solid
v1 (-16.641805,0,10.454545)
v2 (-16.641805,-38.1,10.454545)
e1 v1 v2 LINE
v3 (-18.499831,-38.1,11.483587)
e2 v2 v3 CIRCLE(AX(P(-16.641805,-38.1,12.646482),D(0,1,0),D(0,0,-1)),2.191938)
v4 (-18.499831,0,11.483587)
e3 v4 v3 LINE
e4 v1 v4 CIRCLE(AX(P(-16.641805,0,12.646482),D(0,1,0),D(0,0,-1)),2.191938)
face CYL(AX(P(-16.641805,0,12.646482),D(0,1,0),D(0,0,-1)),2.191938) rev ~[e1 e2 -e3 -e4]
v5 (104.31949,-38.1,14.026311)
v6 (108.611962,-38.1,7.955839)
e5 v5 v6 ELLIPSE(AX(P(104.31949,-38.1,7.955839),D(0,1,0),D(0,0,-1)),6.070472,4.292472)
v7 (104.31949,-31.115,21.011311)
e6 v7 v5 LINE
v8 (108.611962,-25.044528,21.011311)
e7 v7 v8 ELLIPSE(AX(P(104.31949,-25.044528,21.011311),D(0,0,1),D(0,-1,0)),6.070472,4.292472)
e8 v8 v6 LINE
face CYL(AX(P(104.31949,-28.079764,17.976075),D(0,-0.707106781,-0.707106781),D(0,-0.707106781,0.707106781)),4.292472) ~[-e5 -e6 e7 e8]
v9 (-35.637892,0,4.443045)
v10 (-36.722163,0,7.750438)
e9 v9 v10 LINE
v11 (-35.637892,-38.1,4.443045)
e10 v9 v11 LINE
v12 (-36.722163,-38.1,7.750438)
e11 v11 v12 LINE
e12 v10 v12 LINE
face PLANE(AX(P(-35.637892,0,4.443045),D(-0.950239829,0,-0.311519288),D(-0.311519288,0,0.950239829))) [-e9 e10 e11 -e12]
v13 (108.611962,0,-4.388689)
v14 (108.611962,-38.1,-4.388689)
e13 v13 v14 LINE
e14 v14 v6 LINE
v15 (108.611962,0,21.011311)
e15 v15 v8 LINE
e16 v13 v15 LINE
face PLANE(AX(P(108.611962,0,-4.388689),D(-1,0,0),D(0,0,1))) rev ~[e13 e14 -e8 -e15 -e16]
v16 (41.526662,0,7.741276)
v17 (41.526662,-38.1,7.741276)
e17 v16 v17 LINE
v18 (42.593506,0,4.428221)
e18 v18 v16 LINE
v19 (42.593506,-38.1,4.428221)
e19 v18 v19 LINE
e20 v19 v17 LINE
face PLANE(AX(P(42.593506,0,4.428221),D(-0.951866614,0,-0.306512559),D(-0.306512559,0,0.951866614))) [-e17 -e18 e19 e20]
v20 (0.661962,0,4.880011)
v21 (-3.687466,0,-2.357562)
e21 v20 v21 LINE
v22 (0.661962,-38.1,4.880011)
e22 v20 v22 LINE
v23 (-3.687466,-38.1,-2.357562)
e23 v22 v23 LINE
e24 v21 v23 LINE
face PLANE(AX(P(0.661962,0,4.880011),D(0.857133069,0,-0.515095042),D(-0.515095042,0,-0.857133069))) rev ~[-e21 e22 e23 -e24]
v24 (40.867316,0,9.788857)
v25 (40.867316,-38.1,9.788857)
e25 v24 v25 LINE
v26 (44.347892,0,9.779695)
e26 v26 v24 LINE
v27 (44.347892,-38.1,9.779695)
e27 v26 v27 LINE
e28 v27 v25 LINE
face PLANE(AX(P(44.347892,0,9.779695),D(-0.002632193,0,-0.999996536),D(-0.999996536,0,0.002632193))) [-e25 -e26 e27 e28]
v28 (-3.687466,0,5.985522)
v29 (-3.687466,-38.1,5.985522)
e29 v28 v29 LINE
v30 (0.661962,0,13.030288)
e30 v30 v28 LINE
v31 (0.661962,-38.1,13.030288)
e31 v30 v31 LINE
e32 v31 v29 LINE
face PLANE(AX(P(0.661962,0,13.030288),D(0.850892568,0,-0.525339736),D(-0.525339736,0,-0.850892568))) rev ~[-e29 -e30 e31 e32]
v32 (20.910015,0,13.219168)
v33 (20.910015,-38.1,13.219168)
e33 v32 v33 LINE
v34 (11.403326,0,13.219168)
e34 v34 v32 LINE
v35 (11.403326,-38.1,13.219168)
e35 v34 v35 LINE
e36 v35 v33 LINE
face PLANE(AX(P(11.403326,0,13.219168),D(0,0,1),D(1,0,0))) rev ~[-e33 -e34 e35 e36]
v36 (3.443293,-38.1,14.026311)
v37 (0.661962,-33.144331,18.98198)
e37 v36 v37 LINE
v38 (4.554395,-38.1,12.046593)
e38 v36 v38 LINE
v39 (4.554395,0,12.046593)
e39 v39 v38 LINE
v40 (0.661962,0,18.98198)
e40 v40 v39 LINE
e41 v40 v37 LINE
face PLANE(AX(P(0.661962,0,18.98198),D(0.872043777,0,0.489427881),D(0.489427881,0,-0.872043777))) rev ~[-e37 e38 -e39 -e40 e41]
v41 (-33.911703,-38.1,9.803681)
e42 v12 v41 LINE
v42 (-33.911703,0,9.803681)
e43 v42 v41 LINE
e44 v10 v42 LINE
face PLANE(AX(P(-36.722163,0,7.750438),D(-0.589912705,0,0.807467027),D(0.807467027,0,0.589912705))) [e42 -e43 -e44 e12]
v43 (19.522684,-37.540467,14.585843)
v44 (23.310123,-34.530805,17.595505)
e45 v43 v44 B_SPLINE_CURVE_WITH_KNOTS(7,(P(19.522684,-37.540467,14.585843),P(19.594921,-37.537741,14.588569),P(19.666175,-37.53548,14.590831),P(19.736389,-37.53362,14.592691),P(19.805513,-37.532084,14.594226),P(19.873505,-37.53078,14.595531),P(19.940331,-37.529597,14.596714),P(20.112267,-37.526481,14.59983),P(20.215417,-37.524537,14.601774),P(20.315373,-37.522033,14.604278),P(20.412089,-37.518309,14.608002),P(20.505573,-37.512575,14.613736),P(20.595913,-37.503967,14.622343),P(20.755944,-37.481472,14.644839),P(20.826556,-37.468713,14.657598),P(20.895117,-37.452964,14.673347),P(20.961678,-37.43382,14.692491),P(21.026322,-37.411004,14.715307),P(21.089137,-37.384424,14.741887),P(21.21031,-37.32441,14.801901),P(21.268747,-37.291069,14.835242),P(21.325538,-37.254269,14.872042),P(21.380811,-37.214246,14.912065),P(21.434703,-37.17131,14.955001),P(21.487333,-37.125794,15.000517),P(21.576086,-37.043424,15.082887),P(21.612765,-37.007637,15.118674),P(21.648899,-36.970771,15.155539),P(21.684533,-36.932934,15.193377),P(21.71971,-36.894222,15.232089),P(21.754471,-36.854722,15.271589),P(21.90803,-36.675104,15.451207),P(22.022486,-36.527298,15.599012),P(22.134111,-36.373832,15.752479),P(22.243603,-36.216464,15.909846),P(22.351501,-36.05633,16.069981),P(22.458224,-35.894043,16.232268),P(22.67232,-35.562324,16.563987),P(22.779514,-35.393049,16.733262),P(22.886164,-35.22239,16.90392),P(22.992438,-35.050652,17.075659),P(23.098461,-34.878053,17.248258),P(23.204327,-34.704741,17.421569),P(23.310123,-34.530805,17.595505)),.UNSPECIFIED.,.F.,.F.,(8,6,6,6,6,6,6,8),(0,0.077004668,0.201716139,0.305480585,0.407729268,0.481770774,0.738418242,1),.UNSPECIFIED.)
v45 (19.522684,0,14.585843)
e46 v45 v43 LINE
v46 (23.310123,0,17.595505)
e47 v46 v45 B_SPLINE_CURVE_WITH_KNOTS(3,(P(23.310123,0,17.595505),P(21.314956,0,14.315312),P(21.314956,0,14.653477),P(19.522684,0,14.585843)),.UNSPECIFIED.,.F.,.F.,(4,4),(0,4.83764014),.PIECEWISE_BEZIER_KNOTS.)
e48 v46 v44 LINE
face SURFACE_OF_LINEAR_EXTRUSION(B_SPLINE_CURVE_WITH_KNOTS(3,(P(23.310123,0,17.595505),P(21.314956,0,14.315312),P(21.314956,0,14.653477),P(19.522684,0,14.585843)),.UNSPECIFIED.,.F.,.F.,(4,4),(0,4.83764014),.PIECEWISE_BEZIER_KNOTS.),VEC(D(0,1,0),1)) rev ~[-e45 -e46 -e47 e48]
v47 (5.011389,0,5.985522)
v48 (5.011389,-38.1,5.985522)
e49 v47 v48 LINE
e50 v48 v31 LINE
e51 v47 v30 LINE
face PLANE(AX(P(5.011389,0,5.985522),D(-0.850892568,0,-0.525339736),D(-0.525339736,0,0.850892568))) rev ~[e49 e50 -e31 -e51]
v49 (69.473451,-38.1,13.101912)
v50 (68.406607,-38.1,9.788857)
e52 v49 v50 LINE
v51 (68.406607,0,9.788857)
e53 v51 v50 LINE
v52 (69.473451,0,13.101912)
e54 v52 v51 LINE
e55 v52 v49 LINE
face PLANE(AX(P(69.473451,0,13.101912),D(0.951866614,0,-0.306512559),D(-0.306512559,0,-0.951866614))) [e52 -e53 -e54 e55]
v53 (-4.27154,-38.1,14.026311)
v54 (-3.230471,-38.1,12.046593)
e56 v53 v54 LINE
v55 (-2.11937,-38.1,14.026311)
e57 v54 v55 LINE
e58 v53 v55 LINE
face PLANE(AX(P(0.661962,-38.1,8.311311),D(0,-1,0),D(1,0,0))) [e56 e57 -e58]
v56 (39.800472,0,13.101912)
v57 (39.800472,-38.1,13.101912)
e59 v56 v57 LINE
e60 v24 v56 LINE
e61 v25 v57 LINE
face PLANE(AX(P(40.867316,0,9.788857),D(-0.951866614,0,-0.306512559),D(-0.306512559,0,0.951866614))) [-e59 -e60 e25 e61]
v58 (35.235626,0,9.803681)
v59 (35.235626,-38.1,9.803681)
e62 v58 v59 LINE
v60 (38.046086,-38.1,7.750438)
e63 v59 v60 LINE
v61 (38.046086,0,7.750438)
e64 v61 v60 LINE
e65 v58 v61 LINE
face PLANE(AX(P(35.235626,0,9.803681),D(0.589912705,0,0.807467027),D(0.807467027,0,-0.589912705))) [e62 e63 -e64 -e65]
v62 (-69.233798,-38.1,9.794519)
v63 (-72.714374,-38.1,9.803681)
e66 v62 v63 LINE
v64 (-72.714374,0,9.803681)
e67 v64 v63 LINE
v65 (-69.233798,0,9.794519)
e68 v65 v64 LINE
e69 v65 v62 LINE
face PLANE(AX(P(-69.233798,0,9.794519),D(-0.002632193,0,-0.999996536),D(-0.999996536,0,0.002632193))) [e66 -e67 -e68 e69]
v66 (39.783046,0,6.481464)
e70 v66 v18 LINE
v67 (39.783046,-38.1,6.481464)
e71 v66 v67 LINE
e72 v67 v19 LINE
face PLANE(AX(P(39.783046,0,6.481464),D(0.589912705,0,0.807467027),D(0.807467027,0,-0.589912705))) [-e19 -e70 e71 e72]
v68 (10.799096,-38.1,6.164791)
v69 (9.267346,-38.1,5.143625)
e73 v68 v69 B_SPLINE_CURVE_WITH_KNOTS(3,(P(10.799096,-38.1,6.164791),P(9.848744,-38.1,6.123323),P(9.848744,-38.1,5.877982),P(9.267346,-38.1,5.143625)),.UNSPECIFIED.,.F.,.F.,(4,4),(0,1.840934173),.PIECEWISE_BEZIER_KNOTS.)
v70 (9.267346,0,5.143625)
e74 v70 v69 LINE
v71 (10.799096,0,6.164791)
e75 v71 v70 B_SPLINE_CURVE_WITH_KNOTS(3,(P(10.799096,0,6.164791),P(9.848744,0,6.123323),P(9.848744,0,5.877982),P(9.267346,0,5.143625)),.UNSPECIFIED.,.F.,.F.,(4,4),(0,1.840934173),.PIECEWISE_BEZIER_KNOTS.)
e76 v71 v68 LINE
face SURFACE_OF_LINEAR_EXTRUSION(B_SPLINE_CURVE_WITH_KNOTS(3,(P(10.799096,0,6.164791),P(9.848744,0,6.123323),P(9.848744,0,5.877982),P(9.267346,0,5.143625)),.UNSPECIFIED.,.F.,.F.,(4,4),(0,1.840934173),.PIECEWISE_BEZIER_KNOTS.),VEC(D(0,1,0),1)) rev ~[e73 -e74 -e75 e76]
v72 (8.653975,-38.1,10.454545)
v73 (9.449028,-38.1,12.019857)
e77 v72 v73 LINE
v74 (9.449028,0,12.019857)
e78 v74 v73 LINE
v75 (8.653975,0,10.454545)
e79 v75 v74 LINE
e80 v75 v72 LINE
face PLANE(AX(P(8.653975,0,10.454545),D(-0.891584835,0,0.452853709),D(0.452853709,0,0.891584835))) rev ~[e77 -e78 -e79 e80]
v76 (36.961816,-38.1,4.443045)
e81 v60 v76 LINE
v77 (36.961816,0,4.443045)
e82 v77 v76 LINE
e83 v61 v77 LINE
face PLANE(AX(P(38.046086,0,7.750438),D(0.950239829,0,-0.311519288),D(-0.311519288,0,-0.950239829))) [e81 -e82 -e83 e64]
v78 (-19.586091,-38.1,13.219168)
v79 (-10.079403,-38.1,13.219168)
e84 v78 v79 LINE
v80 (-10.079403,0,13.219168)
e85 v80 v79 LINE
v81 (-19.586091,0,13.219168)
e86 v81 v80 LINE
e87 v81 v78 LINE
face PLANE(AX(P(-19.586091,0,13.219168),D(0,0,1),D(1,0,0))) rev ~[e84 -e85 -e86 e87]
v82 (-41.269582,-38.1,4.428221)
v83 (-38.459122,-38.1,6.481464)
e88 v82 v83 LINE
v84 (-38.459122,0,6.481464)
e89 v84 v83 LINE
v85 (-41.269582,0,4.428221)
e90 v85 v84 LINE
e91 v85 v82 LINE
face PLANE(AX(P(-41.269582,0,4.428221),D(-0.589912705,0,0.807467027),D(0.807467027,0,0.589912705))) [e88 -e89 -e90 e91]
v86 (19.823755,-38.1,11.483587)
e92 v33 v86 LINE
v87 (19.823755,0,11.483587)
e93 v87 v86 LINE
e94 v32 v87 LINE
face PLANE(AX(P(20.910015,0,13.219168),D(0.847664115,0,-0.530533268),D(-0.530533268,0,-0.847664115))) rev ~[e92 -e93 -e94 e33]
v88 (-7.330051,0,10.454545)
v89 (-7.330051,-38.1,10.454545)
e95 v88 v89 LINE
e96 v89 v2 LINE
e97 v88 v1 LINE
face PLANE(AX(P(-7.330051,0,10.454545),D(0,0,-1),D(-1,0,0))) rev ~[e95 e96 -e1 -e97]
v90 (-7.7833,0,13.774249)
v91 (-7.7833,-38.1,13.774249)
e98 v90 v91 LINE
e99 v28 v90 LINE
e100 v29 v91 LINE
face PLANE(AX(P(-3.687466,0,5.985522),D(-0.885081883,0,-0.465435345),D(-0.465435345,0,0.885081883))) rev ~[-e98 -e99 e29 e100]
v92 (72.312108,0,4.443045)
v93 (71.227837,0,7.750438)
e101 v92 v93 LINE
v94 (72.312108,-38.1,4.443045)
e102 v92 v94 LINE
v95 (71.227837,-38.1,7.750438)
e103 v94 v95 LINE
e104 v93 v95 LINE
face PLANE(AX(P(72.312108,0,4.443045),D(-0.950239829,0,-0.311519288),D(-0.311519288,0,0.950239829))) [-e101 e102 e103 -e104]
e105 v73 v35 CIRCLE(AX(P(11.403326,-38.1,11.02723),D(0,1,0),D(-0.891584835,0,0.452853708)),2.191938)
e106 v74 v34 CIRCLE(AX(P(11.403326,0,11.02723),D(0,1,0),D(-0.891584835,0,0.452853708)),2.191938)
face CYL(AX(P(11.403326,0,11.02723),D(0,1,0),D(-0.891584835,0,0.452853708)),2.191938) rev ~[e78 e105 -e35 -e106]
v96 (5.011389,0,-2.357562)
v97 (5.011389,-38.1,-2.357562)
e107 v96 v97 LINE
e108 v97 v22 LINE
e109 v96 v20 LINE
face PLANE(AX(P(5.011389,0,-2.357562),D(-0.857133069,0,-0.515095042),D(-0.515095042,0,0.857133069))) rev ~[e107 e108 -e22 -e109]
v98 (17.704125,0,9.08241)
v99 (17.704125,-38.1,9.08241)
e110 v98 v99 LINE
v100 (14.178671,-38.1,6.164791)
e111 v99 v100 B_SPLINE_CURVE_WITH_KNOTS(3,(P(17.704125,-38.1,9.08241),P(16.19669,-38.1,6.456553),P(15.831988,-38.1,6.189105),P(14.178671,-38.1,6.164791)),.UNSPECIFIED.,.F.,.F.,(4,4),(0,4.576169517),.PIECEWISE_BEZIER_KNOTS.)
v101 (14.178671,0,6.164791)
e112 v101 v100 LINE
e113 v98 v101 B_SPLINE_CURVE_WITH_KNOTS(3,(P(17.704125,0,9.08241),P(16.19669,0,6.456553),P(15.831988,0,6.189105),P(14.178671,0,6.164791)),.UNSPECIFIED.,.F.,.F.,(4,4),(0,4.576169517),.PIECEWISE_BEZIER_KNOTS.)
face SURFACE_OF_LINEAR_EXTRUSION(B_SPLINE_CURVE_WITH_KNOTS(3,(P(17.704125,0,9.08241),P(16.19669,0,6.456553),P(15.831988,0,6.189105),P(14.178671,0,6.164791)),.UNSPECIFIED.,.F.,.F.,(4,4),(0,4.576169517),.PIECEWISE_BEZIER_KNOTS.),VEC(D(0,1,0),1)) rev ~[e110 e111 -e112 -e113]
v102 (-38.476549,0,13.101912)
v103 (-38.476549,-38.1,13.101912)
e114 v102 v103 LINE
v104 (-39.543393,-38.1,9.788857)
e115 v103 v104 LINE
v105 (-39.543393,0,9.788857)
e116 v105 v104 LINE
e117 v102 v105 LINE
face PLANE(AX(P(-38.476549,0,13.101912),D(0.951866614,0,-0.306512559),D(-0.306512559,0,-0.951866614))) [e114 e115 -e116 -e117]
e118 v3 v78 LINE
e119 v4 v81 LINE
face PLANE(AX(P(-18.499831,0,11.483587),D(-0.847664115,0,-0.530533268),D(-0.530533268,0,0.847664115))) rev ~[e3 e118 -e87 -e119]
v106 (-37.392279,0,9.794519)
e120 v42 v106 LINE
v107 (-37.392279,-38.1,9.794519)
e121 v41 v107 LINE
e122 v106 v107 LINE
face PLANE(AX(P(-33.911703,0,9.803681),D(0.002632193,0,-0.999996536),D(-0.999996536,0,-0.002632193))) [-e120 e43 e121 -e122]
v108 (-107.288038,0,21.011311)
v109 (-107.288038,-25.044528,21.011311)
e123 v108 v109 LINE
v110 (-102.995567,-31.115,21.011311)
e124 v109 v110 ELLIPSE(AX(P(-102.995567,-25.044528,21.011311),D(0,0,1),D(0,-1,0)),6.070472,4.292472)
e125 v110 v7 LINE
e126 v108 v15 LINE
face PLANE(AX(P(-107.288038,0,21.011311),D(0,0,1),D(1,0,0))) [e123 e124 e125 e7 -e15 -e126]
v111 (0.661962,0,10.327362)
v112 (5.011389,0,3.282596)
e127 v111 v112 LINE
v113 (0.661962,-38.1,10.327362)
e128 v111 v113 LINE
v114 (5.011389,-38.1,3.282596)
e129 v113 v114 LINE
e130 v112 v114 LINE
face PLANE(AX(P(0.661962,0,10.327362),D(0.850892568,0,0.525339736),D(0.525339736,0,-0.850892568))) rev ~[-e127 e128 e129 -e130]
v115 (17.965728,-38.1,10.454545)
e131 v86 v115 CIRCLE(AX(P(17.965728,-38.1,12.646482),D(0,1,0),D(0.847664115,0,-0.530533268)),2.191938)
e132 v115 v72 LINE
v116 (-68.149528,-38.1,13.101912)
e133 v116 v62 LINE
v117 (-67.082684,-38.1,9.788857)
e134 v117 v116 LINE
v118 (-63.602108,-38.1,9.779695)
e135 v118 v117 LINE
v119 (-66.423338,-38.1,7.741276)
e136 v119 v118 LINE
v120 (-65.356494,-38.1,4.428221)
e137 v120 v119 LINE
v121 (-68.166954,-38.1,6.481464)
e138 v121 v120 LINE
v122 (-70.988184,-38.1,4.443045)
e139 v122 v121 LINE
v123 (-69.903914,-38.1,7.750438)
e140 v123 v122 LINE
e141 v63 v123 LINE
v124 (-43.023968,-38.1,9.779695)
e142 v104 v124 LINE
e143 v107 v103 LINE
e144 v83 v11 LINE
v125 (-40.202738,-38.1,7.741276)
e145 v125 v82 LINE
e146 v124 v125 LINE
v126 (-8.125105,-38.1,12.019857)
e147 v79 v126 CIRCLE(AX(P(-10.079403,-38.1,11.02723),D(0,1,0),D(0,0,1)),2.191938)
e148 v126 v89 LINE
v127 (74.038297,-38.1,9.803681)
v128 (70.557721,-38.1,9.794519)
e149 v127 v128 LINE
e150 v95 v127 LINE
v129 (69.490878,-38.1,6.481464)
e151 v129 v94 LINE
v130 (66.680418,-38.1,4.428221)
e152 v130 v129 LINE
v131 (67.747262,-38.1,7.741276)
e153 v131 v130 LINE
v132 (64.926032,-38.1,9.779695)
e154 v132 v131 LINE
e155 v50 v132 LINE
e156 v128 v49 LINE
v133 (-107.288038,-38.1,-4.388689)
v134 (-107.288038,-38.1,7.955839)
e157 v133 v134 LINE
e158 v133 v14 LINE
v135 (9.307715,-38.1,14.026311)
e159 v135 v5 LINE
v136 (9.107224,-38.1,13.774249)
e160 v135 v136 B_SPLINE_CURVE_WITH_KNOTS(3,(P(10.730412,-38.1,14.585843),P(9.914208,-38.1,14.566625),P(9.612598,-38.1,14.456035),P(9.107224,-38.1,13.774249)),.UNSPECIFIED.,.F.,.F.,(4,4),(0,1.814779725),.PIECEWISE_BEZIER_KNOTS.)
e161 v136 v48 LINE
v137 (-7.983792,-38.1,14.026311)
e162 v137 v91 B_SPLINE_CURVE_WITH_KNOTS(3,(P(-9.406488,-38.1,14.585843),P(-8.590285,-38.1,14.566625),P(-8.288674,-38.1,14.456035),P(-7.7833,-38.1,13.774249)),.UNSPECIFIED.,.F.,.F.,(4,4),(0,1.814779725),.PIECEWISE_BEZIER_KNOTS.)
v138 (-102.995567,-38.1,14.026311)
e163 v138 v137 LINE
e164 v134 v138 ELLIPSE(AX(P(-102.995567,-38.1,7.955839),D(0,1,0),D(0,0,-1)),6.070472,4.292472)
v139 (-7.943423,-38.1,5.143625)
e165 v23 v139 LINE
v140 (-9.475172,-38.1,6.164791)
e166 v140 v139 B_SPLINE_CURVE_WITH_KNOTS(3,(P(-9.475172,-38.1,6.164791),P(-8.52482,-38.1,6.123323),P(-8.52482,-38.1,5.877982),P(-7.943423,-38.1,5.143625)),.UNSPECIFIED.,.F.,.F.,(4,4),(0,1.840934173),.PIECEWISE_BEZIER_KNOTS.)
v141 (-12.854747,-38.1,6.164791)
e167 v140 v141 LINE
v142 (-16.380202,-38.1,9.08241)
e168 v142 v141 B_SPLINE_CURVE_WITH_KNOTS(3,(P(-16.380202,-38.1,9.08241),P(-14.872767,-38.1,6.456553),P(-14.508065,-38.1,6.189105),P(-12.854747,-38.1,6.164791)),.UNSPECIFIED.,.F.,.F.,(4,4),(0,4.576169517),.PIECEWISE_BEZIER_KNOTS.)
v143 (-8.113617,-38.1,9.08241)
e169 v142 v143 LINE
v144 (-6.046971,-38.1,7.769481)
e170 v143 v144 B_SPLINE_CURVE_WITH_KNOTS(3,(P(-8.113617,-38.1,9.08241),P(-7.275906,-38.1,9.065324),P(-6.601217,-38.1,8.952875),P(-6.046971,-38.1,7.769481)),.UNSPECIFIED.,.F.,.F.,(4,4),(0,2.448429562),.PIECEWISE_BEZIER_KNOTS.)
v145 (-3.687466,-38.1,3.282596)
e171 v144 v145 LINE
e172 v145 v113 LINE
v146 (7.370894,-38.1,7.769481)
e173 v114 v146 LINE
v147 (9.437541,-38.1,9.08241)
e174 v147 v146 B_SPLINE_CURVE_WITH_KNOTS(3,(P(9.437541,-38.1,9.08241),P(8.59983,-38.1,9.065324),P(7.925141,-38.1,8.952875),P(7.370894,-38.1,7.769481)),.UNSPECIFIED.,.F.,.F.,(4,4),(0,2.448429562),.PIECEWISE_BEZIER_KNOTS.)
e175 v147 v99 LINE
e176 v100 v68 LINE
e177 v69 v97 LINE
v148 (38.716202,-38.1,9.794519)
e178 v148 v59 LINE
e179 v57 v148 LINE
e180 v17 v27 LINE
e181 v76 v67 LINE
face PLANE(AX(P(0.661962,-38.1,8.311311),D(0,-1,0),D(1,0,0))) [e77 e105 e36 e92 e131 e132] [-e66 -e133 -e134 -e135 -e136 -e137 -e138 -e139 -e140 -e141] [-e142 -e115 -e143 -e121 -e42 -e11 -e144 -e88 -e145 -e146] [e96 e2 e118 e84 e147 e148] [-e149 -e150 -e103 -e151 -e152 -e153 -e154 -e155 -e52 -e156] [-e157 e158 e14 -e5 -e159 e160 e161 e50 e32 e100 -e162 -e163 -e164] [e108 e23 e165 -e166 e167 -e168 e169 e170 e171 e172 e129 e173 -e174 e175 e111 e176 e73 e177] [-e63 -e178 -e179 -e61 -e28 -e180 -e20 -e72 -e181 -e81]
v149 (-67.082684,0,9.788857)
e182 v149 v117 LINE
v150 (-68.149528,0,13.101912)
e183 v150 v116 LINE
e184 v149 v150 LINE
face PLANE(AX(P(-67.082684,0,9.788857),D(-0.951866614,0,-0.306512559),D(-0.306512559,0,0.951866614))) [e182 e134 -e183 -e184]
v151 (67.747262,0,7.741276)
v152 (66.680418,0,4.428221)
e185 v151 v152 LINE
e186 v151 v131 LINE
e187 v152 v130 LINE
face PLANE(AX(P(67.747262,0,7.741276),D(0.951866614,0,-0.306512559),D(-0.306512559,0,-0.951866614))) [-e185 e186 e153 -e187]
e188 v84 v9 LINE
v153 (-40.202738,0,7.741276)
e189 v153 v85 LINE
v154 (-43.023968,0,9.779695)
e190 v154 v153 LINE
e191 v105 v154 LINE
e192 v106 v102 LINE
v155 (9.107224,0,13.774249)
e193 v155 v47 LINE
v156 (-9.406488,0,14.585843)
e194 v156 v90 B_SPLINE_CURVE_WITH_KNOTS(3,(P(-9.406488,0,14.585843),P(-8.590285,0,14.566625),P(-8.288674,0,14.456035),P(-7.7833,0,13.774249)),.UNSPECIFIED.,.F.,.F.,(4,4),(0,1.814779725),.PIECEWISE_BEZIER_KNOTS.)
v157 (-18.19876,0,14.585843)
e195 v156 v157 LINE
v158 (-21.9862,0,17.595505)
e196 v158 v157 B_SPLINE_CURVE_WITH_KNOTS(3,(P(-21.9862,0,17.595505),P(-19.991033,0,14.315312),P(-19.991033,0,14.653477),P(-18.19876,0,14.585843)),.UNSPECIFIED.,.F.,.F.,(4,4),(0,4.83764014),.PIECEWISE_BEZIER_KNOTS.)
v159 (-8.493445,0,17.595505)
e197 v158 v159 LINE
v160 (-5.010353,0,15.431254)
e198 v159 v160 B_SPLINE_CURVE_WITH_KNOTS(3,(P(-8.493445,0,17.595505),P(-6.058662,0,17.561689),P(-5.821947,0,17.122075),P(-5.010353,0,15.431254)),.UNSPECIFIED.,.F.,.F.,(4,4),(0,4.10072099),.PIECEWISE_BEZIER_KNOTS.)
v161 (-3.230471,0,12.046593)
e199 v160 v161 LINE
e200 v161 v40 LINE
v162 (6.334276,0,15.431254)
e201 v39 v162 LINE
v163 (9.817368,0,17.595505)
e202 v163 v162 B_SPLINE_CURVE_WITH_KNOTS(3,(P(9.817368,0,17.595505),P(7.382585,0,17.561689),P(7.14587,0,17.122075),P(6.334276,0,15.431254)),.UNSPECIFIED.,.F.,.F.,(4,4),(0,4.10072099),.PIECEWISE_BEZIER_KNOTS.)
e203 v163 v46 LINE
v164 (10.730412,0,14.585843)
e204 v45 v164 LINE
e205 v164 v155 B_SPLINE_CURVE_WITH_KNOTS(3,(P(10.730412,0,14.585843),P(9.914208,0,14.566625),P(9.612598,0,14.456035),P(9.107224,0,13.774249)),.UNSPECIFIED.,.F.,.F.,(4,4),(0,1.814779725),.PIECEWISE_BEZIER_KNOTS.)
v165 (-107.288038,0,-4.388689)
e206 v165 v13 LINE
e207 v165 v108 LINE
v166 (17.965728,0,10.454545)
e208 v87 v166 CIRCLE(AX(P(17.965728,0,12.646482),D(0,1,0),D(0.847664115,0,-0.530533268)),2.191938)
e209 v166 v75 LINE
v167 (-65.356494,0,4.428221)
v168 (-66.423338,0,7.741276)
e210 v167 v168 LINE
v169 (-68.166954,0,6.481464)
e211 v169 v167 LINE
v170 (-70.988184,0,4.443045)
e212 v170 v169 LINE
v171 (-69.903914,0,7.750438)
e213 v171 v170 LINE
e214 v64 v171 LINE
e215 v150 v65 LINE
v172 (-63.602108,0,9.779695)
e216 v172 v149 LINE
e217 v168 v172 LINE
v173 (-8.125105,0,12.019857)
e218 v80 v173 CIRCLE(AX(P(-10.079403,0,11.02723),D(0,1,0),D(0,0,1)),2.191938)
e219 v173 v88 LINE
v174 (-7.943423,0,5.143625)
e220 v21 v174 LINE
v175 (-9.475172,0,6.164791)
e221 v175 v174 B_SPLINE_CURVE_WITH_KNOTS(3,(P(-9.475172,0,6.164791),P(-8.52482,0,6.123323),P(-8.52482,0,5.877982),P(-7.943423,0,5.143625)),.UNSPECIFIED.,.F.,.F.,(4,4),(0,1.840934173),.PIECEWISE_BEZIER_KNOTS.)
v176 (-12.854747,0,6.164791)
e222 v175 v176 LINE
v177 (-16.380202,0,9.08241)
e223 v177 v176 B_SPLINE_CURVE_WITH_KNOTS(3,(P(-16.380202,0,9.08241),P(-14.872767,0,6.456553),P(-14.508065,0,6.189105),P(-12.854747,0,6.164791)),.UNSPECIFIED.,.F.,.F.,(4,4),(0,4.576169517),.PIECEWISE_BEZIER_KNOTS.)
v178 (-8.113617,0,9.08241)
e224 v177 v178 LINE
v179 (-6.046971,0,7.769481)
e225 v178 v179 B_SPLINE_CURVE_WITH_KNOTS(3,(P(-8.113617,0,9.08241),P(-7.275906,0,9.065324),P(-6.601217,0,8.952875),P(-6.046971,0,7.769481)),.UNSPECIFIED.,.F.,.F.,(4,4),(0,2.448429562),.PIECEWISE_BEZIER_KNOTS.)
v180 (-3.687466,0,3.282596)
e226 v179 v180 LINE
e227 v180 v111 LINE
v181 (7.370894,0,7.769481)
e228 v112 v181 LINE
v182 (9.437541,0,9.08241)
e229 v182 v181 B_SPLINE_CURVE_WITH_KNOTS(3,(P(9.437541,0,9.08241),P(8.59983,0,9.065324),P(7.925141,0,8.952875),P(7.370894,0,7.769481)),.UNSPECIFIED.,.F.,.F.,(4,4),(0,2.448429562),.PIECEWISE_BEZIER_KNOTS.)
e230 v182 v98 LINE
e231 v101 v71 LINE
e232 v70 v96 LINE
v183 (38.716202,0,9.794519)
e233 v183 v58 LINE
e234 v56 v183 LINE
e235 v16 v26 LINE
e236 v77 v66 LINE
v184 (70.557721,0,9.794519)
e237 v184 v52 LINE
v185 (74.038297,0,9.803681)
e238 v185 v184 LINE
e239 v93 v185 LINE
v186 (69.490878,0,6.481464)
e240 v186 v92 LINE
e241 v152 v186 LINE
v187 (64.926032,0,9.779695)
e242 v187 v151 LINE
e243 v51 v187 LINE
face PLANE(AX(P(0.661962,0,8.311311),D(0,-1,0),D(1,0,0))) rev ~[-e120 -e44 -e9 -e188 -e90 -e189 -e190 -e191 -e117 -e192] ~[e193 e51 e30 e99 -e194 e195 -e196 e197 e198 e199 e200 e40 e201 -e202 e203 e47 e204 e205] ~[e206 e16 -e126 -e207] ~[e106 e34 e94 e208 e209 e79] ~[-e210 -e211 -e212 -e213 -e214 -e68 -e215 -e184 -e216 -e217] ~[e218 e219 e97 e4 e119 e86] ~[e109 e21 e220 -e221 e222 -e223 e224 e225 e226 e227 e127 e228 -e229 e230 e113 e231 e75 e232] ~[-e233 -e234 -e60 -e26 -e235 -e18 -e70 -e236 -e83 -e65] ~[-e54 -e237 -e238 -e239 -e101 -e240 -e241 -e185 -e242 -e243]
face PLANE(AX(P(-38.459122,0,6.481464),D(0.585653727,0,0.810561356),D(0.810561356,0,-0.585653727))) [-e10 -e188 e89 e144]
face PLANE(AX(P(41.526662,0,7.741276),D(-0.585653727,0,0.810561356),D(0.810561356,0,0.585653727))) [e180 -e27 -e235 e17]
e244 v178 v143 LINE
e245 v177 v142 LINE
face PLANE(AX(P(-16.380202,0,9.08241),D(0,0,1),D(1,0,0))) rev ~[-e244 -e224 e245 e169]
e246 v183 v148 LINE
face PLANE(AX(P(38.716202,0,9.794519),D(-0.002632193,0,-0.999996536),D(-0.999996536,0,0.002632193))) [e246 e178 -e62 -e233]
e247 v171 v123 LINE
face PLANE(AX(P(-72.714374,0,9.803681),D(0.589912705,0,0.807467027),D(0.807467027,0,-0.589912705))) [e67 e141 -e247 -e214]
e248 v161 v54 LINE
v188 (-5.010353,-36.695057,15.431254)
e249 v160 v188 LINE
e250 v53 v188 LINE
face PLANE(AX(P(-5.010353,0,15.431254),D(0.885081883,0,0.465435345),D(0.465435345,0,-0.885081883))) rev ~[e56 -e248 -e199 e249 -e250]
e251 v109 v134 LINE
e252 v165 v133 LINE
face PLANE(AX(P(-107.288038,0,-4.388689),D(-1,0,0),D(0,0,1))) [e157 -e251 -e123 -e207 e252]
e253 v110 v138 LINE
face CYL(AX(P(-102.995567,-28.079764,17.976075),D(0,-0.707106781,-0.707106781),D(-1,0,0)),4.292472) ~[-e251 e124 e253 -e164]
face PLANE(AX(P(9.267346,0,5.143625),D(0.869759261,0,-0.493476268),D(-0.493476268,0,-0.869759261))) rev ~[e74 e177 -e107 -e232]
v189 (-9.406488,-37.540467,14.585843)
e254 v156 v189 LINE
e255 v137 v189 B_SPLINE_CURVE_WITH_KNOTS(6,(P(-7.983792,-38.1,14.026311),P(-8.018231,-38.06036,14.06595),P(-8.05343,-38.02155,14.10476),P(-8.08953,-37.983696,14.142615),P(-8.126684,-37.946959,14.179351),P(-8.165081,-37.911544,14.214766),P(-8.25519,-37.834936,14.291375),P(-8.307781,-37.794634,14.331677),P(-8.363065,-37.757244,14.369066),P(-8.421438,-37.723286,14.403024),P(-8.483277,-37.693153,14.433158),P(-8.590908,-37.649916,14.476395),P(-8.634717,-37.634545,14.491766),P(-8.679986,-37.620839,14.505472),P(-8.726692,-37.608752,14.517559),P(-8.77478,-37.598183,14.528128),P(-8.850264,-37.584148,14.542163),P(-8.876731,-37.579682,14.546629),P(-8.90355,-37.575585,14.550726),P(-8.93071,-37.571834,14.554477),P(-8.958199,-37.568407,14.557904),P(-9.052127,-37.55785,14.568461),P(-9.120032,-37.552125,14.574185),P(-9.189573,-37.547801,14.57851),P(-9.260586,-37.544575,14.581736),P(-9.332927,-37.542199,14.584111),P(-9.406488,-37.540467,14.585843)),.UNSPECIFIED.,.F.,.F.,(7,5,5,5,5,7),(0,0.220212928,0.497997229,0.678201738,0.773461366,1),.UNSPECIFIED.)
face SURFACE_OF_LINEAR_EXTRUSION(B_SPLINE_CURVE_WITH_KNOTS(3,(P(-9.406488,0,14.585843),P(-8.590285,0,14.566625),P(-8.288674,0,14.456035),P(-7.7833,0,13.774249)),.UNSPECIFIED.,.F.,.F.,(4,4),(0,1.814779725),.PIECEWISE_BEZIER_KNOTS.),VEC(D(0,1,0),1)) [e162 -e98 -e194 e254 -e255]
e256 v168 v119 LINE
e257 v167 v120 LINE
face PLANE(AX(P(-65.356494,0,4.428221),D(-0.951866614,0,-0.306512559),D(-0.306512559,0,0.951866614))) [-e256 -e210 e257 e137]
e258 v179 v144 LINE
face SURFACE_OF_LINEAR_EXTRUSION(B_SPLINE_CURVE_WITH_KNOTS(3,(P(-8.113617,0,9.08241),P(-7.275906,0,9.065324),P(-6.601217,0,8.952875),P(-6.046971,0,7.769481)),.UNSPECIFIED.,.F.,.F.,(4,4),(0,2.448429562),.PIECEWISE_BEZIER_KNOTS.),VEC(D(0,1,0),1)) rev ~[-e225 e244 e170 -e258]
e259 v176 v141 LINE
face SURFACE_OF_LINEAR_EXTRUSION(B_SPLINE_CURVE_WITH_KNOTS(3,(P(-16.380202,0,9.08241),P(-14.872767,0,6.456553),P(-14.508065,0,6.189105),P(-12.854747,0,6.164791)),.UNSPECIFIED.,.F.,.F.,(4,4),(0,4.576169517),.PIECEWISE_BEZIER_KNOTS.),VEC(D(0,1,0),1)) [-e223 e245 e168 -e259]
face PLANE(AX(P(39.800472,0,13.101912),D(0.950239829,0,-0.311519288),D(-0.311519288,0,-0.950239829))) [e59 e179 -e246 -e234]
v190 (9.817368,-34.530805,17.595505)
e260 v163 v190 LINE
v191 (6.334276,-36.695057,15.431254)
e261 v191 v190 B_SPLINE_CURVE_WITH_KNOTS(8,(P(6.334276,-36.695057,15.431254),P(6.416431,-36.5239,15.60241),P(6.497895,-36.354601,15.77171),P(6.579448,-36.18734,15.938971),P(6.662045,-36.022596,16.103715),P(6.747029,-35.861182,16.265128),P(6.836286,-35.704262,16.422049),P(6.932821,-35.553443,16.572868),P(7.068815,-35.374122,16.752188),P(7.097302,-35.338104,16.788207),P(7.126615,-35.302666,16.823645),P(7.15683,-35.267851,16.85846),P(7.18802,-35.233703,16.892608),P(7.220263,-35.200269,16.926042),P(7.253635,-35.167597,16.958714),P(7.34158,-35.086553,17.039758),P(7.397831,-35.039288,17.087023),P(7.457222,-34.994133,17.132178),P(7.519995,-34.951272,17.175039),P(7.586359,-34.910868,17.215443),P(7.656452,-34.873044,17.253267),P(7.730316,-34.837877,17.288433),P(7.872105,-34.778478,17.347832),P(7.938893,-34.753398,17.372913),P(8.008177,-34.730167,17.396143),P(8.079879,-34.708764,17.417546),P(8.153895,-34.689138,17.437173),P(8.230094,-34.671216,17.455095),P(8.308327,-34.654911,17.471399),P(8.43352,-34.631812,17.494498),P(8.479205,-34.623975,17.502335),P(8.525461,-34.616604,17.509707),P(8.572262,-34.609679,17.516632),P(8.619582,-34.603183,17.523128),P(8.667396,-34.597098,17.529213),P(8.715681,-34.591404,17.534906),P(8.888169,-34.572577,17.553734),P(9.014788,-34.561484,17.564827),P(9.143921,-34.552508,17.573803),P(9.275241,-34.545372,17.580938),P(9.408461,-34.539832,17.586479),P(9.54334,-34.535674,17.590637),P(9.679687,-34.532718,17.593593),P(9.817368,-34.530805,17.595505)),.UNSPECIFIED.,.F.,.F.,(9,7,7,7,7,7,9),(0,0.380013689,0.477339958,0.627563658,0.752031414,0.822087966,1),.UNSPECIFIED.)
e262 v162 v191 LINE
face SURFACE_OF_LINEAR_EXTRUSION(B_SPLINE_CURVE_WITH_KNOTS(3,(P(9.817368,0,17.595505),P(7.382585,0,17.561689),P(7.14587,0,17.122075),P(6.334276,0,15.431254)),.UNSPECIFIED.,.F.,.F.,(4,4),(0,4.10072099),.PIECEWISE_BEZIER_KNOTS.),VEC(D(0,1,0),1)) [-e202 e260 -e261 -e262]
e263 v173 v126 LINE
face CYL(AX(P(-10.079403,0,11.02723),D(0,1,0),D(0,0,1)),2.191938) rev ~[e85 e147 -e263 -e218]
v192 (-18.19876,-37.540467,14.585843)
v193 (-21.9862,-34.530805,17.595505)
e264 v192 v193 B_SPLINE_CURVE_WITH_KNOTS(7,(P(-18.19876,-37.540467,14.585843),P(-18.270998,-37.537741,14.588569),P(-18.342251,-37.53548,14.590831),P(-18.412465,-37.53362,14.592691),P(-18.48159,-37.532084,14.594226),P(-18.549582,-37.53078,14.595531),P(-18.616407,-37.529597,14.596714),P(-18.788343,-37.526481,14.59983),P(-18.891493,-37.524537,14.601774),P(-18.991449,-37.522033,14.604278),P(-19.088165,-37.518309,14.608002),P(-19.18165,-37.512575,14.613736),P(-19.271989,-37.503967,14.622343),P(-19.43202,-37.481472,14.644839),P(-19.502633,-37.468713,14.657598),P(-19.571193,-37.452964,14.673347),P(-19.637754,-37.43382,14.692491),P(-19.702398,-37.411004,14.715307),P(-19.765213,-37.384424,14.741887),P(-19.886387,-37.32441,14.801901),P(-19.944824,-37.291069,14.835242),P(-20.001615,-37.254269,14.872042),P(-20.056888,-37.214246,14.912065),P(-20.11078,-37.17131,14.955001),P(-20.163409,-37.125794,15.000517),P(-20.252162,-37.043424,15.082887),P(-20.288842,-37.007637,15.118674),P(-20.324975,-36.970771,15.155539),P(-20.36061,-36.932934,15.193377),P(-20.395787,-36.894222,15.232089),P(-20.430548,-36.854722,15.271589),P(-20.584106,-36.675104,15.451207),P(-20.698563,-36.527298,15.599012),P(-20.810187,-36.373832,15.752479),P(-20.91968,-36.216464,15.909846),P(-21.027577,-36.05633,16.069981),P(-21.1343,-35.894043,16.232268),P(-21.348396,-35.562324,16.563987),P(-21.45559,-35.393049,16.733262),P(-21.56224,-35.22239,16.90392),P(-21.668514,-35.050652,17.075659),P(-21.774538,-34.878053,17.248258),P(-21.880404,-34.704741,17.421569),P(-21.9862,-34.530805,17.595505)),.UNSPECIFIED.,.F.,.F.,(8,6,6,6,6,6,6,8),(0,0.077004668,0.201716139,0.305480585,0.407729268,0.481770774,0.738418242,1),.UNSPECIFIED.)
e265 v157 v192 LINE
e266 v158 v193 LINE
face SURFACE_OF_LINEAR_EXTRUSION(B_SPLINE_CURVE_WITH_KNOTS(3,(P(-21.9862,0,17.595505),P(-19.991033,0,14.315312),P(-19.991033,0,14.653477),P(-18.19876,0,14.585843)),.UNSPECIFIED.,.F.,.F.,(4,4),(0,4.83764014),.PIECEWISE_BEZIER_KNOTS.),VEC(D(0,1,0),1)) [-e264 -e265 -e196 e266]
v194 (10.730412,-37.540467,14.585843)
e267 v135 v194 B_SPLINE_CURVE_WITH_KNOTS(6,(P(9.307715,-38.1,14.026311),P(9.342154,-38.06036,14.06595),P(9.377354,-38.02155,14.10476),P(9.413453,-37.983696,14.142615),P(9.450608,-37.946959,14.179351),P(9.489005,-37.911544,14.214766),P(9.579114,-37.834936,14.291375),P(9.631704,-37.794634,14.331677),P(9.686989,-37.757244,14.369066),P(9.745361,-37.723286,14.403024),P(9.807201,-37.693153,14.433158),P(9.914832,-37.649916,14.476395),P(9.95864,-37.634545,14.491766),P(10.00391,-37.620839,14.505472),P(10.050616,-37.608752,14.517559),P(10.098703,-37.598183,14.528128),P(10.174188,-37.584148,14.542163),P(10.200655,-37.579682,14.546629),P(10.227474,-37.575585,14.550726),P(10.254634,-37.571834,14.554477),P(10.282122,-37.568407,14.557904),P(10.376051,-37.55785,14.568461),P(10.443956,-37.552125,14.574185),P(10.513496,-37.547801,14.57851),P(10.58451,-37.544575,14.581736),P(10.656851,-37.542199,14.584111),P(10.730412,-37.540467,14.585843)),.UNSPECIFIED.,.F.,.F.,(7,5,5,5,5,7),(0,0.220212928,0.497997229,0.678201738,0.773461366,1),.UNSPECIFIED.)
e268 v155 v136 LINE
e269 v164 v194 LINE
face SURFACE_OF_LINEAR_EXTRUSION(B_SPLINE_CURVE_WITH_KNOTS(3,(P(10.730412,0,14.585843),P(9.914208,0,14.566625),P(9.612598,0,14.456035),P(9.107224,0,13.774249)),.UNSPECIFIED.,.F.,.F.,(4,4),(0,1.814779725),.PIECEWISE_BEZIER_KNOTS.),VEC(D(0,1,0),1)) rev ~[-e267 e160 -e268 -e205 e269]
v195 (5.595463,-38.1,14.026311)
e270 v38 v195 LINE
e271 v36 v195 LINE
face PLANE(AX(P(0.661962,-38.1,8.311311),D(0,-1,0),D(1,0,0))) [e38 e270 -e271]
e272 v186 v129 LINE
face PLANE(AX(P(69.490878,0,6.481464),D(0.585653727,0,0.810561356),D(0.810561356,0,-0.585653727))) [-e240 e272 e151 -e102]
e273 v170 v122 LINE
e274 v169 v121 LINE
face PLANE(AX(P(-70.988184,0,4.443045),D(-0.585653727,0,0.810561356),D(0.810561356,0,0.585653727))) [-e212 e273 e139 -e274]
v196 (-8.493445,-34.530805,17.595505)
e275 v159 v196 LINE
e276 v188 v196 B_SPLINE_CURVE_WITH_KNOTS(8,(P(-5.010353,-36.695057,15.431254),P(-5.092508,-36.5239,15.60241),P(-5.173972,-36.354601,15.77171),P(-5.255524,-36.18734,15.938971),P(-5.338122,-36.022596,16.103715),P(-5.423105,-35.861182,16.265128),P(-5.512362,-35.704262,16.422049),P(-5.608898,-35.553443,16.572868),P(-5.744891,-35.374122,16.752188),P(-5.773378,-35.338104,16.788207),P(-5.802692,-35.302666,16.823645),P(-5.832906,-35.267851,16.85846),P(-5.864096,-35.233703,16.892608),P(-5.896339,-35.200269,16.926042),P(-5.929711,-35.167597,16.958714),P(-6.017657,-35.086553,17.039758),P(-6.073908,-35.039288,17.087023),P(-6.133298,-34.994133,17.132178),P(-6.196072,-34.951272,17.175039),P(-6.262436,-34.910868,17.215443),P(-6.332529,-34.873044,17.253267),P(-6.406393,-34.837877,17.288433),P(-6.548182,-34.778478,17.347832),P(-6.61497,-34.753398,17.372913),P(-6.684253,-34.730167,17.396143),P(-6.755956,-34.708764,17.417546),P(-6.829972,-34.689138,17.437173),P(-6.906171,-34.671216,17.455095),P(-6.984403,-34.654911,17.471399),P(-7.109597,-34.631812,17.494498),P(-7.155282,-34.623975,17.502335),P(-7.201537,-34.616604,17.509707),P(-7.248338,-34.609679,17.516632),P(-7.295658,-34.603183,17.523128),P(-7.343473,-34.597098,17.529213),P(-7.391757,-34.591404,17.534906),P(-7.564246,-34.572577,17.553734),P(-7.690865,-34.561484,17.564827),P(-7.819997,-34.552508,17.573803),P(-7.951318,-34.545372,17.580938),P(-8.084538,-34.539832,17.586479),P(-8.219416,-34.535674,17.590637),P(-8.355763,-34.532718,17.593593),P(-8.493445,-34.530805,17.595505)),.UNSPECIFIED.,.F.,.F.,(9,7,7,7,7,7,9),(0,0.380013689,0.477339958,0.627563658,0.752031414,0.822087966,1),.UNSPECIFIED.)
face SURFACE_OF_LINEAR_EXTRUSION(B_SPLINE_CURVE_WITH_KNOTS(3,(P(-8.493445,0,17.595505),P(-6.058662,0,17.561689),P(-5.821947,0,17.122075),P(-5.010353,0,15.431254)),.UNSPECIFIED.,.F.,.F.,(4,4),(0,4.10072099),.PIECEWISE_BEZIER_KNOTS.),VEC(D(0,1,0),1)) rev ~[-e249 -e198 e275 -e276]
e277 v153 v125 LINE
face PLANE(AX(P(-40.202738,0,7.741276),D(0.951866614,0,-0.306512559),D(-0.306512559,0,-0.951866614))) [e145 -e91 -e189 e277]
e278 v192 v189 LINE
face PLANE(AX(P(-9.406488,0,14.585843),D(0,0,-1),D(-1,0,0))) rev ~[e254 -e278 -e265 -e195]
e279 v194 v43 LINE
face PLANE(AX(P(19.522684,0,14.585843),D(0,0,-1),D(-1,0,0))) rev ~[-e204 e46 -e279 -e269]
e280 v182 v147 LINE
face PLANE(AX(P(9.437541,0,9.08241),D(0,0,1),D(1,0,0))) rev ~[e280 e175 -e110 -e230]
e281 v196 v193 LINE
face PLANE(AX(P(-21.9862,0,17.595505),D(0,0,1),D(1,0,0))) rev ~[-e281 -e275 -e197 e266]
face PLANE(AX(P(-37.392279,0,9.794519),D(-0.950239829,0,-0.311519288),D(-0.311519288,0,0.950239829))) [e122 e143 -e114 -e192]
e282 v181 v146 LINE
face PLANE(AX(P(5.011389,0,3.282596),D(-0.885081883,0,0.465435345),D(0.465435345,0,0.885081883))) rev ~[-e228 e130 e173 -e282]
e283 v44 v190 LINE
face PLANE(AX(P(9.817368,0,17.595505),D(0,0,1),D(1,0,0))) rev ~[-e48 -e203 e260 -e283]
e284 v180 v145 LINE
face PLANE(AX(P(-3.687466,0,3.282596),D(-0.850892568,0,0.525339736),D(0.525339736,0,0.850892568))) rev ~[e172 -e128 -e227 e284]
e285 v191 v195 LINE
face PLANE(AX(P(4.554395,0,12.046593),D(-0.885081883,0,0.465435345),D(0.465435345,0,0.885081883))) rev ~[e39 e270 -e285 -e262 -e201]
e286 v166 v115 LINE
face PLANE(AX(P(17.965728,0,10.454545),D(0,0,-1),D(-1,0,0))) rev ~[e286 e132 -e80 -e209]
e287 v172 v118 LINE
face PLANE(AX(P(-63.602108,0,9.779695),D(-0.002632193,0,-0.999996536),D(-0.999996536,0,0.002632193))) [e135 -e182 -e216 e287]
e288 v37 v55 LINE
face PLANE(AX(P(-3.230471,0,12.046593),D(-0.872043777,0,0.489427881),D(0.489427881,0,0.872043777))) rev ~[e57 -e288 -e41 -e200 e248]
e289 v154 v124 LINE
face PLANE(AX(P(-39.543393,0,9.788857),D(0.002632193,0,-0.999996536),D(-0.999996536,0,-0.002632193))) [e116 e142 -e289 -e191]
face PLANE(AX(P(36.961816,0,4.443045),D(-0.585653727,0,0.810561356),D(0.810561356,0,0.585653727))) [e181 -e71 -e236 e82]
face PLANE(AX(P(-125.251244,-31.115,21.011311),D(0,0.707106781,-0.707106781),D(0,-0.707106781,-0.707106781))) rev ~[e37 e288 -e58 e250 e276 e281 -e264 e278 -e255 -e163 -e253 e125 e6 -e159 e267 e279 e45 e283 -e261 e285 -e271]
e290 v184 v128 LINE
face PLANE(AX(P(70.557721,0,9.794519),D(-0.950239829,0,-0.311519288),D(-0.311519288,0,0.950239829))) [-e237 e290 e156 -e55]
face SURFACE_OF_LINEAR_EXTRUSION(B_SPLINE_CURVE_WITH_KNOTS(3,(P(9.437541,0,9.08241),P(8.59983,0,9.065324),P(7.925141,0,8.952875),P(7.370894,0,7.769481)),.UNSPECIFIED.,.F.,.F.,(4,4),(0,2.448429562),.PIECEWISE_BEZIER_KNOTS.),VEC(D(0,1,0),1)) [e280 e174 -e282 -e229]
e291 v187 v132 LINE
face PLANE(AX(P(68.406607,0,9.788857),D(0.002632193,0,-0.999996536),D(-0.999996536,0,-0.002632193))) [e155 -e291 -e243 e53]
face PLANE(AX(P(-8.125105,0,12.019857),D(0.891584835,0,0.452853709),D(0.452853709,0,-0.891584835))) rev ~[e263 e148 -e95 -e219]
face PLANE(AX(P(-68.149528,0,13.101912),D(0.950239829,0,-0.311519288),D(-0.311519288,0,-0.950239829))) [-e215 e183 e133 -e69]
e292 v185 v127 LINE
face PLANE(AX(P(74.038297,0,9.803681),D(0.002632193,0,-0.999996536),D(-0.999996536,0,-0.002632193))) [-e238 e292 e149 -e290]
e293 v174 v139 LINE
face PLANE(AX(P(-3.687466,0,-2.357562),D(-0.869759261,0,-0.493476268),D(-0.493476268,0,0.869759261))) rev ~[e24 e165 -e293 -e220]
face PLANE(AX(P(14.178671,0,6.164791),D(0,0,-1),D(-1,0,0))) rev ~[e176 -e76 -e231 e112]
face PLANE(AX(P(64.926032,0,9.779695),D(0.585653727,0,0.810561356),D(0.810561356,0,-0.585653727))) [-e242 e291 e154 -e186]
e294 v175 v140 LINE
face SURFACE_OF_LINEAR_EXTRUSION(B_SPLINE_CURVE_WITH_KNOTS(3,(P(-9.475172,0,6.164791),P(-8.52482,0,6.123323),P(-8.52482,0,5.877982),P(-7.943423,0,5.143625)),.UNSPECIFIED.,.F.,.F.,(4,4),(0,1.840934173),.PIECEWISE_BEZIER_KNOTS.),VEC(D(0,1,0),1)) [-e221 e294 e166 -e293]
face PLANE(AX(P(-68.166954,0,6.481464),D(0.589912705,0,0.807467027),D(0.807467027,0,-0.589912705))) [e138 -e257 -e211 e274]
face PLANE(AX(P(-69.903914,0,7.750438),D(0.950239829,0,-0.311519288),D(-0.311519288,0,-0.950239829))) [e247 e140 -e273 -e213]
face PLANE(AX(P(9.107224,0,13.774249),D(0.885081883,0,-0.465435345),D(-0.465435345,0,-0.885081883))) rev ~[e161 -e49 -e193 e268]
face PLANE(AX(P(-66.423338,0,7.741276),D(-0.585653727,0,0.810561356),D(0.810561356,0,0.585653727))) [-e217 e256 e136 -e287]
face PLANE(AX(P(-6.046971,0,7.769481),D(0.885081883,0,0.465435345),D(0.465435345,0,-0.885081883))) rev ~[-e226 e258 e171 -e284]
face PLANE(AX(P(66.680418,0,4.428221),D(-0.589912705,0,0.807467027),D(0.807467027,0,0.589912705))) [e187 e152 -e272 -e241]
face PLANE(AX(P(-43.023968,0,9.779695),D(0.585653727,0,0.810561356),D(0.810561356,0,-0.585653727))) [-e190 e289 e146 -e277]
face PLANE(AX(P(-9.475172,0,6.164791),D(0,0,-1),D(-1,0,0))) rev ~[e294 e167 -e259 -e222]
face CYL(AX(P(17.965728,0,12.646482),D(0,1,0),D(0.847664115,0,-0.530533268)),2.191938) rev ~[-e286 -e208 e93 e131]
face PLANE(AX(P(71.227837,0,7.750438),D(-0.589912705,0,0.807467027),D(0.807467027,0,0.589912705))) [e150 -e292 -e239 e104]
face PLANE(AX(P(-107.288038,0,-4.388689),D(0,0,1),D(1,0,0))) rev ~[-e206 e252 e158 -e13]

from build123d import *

# Parameters (mm, degrees)
F0_W        = 215.9
F0_H        = 25.4
F1_DEPTH    = 38.1
F3_DEPTH    = 38.1
F4_T1_DEPTH = 251.8264113419
F5_R        = 4.2924717139


# Not quite as in the source:
# - a fillet or chamfer that OpenCascade refuses, or shapes differently, is made with other operations: its cross-section is extruded or revolved along the edge and cut away or added


with BuildPart() as f1:
    # F0 (on Front) → F1 (new body)
    with BuildSketch(Plane.XZ):
        with Locations((0.6619617343, 8.3113107191)):
            Rectangle(F0_W, F0_H)
        with BuildLine():
            add(Edge.make_bspline(
                [(-16.3802020252, 9.0824095532), (-14.8727670312, 6.4565530047), (-14.5080648363, 6.1891046353), (-12.8547474742, 6.1647910625)],
                knots=[0, 0, 0, 0, 4.576169517, 4.576169517, 4.576169517, 4.576169517], degree=3))
            Line((-16.3802020252, 9.0824095532), (-8.1136170775, 9.0824095532))
            add(Edge.make_bspline(
                [(-8.1136170775, 9.0824095532), (-7.2759063914, 9.0653235093), (-6.6012172028, 8.9528746903), (-6.0469708405, 7.769481279)],
                knots=[0, 0, 0, 0, 2.4484295624, 2.4484295624, 2.4484295624, 2.4484295624], degree=3))
            Line((-6.0469708405, 7.769481279), (-3.6874657962, 3.2825956335))
            Line((-3.6874657962, 3.2825956335), (0.6619617343, 10.3273617318))
            Line((0.6619617343, 10.3273617318), (5.0113892648, 3.2825956335))
            Line((5.0113892648, 3.2825956335), (7.3708943091, 7.769481279))
            add(Edge.make_bspline(
                [(9.4375405461, 9.0824095532), (8.59982986, 9.0653235093), (7.9251406714, 8.9528746903), (7.3708943091, 7.769481279)],
                knots=[0, 0, 0, 0, 2.4484295624, 2.4484295624, 2.4484295624, 2.4484295624], degree=3))
            Line((9.4375405461, 9.0824095532), (17.7041254938, 9.0824095532))
            add(Edge.make_bspline(
                [(17.7041254938, 9.0824095532), (16.1966904998, 6.4565530047), (15.8319883049, 6.1891046353), (14.1786709428, 6.1647910625)],
                knots=[0, 0, 0, 0, 4.576169517, 4.576169517, 4.576169517, 4.576169517], degree=3))
            Line((14.1786709428, 6.1647910625), (10.7990959659, 6.1647910625))
            add(Edge.make_bspline(
                [(10.7990959659, 6.1647910625), (9.8487436771, 6.1233234592), (9.8487436771, 5.8779818937), (9.2673460022, 5.1436247304)],
                knots=[0, 0, 0, 0, 1.840934173, 1.840934173, 1.840934173, 1.840934173], degree=3))
            Line((9.2673460022, 5.1436247304), (5.0113892648, -2.3575623054))
            Line((5.0113892648, -2.3575623054), (0.6619617343, 4.8800110817))
            Line((0.6619617343, 4.8800110817), (-3.6874657962, -2.3575623054))
            Line((-3.6874657962, -2.3575623054), (-7.9434225336, 5.1436247304))
            add(Edge.make_bspline(
                [(-9.4751724973, 6.1647910625), (-8.5248202085, 6.1233234592), (-8.5248202085, 5.8779818937), (-7.9434225336, 5.1436247304)],
                knots=[0, 0, 0, 0, 1.840934173, 1.840934173, 1.840934173, 1.840934173], degree=3))
            Line((-9.4751724973, 6.1647910625), (-12.8547474742, 6.1647910625))
        make_face(mode=Mode.SUBTRACT)
        with BuildLine():
            Line((-18.4998314541, 11.4835865716), (-19.5860914445, 13.219167863))
            Line((-19.5860914445, 13.219167863), (-10.0794029066, 13.219167863))
            ThreePointArc((-10.0794029066, 13.219167863), (-8.9329270461, 12.8954335527), (-8.1251045992, 12.0198573444))
            Line((-8.1251045992, 12.0198573444), (-7.3300511576, 10.4545447975))
            Line((-7.3300511576, 10.4545447975), (-16.641804624, 10.4545447975))
            ThreePointArc((-16.641804624, 10.4545447975), (-17.7037828104, 10.7289859143), (-18.4998314541, 11.4835865716))
        make_face(mode=Mode.SUBTRACT)
        with BuildLine():
            add(Edge.make_bspline(
                [(-21.9861995429, 17.5955053419), (-19.9910327792, 14.315311797), (-19.9910327792, 14.6534768865), (-18.1987602264, 14.5858433098)],
                knots=[0, 0, 0, 0, 4.83764014, 4.83764014, 4.83764014, 4.83764014], degree=3))
            Line((-21.9861995429, 17.5955053419), (-8.4934448823, 17.5955053419))
            add(Edge.make_bspline(
                [(-8.4934448823, 17.5955053419), (-6.0586617328, 17.5616890192), (-5.8219470084, 17.1220749617), (-5.0103529356, 15.4312541708)],
                knots=[0, 0, 0, 0, 4.1007209903, 4.1007209903, 4.1007209903, 4.1007209903], degree=3))
            Line((-5.0103529356, 15.4312541708), (-3.2304712382, 12.0465927742))
            Line((-3.2304712382, 12.0465927742), (0.6619617343, 18.9819801599))
            Line((0.6619617343, 18.9819801599), (4.5543947068, 12.0465927742))
            Line((4.5543947068, 12.0465927742), (6.3342764042, 15.4312541708))
            add(Edge.make_bspline(
                [(9.8173683509, 17.5955053419), (7.3825852014, 17.5616890192), (7.145870477, 17.1220749617), (6.3342764042, 15.4312541708)],
                knots=[0, 0, 0, 0, 4.1007209903, 4.1007209903, 4.1007209903, 4.1007209903], degree=3))
            Line((9.8173683509, 17.5955053419), (23.3101230115, 17.5955053419))
            add(Edge.make_bspline(
                [(23.3101230115, 17.5955053419), (21.3149562478, 14.315311797), (21.3149562478, 14.6534768865), (19.522683695, 14.5858433098)],
                knots=[0, 0, 0, 0, 4.83764014, 4.83764014, 4.83764014, 4.83764014], degree=3))
            Line((19.522683695, 14.5858433098), (10.7304118574, 14.5858433098))
            add(Edge.make_bspline(
                [(10.7304118574, 14.5858433098), (9.9142082036, 14.5666254684), (9.6125975251, 14.456034638), (9.1072237119, 13.7742487714)],
                knots=[0, 0, 0, 0, 1.814779725, 1.814779725, 1.814779725, 1.814779725], degree=3))
            Line((9.1072237119, 13.7742487714), (5.0113892648, 5.9855217114))
            Line((5.0113892648, 5.9855217114), (0.6619617343, 13.0302878097))
            Line((0.6619617343, 13.0302878097), (-3.6874657962, 5.9855217114))
            Line((-3.6874657962, 5.9855217114), (-7.7833002433, 13.7742487714))
            add(Edge.make_bspline(
                [(-9.4064883888, 14.5858433098), (-8.590284735, 14.5666254684), (-8.2886740565, 14.456034638), (-7.7833002433, 13.7742487714)],
                knots=[0, 0, 0, 0, 1.814779725, 1.814779725, 1.814779725, 1.814779725], degree=3))
            Line((-9.4064883888, 14.5858433098), (-18.1987602264, 14.5858433098))
        make_face(mode=Mode.SUBTRACT)
        with BuildLine():
            Line((11.4033263752, 13.219167863), (20.910014913, 13.219167863))
            Line((20.910014913, 13.219167863), (19.8237549226, 11.4835865716))
            ThreePointArc((19.8237549226, 11.4835865716), (19.027706279, 10.7289859143), (17.9657280925, 10.4545447975))
            Line((17.9657280925, 10.4545447975), (8.6539746262, 10.4545447975))
            Line((8.6539746262, 10.4545447975), (9.4490280678, 12.0198573444))
            ThreePointArc((9.4490280678, 12.0198573444), (10.2568505147, 12.8954335527), (11.4033263752, 13.219167863))
        make_face(mode=Mode.SUBTRACT)
    extrude(amount=F1_DEPTH)

    # F2 (on Front) → F3 (cut, through all)
    with BuildSketch(Plane.XZ):
        Polygon((-40.2027384589, 7.7412761245), (-41.2695823308, 4.4282208097), (-38.459122454, 6.4814637683), (-35.6378924948, 4.4430445564), (-36.7221627261, 7.7504377039), (-33.9117028493, 9.8036806625), (-37.3922785821, 9.7945190831), (-38.4765488134, 13.1019122305), (-39.5433926854, 9.7888569157), (-43.0239684182, 9.7796953364), align=None)
        Polygon((39.800472282, 13.1019122305), (38.7162020507, 9.7945190831), (35.2356263179, 9.8036806625), (38.0460861947, 7.7504377039), (36.9618159633, 4.4430445564), (39.7830459226, 6.4814637683), (42.5935057994, 4.4282208097), (41.5266619275, 7.7412761245), (44.3478918867, 9.7796953364), (40.867316154, 9.7888569157), align=None)
        Polygon((-63.6021081133, 9.7796953364), (-67.082683846, 9.7888569157), (-68.149527718, 13.1019122305), (-69.2337979493, 9.7945190831), (-72.7143736821, 9.8036806625), (-69.9039138053, 7.7504377039), (-70.9881840367, 4.4430445564), (-68.1669540774, 6.4814637683), (-65.3564942006, 4.4282208097), (-66.4233380725, 7.7412761245), align=None)
        Polygon((70.5577214179, 9.7945190831), (69.4734511866, 13.1019122305), (68.4066073146, 9.7888569157), (64.9260315818, 9.7796953364), (67.7472615411, 7.7412761245), (66.6804176692, 4.4282208097), (69.490877546, 6.4814637683), (72.3121075052, 4.4430445564), (71.2278372739, 7.7504377039), (74.0382971507, 9.8036806625), align=None)
    extrude(amount=F3_DEPTH, mode=Mode.SUBTRACT)

    # F4: chamfer of 6.985 on 1 edges, made by hand

    # F4_s2 → F4_t1 (cut)
    with BuildSketch(Plane.YZ.offset(-125.2512439366)):
        Polygon((-31.115, 21.0113107191), (-38.1, 14.0263107191), (-38.1, 21.0113107191), align=None)
    extrude(amount=F4_T1_DEPTH, mode=Mode.SUBTRACT)

    # F5
    f5_edges = [f1.edges().sort_by_distance(p)[0] for p in [
        (108.611962, -34.6075, 17.518811),
        (-107.288038, -34.6075, 17.518811),
    ]]
    fillet(f5_edges, radius=F5_R)


solid = f1.part
